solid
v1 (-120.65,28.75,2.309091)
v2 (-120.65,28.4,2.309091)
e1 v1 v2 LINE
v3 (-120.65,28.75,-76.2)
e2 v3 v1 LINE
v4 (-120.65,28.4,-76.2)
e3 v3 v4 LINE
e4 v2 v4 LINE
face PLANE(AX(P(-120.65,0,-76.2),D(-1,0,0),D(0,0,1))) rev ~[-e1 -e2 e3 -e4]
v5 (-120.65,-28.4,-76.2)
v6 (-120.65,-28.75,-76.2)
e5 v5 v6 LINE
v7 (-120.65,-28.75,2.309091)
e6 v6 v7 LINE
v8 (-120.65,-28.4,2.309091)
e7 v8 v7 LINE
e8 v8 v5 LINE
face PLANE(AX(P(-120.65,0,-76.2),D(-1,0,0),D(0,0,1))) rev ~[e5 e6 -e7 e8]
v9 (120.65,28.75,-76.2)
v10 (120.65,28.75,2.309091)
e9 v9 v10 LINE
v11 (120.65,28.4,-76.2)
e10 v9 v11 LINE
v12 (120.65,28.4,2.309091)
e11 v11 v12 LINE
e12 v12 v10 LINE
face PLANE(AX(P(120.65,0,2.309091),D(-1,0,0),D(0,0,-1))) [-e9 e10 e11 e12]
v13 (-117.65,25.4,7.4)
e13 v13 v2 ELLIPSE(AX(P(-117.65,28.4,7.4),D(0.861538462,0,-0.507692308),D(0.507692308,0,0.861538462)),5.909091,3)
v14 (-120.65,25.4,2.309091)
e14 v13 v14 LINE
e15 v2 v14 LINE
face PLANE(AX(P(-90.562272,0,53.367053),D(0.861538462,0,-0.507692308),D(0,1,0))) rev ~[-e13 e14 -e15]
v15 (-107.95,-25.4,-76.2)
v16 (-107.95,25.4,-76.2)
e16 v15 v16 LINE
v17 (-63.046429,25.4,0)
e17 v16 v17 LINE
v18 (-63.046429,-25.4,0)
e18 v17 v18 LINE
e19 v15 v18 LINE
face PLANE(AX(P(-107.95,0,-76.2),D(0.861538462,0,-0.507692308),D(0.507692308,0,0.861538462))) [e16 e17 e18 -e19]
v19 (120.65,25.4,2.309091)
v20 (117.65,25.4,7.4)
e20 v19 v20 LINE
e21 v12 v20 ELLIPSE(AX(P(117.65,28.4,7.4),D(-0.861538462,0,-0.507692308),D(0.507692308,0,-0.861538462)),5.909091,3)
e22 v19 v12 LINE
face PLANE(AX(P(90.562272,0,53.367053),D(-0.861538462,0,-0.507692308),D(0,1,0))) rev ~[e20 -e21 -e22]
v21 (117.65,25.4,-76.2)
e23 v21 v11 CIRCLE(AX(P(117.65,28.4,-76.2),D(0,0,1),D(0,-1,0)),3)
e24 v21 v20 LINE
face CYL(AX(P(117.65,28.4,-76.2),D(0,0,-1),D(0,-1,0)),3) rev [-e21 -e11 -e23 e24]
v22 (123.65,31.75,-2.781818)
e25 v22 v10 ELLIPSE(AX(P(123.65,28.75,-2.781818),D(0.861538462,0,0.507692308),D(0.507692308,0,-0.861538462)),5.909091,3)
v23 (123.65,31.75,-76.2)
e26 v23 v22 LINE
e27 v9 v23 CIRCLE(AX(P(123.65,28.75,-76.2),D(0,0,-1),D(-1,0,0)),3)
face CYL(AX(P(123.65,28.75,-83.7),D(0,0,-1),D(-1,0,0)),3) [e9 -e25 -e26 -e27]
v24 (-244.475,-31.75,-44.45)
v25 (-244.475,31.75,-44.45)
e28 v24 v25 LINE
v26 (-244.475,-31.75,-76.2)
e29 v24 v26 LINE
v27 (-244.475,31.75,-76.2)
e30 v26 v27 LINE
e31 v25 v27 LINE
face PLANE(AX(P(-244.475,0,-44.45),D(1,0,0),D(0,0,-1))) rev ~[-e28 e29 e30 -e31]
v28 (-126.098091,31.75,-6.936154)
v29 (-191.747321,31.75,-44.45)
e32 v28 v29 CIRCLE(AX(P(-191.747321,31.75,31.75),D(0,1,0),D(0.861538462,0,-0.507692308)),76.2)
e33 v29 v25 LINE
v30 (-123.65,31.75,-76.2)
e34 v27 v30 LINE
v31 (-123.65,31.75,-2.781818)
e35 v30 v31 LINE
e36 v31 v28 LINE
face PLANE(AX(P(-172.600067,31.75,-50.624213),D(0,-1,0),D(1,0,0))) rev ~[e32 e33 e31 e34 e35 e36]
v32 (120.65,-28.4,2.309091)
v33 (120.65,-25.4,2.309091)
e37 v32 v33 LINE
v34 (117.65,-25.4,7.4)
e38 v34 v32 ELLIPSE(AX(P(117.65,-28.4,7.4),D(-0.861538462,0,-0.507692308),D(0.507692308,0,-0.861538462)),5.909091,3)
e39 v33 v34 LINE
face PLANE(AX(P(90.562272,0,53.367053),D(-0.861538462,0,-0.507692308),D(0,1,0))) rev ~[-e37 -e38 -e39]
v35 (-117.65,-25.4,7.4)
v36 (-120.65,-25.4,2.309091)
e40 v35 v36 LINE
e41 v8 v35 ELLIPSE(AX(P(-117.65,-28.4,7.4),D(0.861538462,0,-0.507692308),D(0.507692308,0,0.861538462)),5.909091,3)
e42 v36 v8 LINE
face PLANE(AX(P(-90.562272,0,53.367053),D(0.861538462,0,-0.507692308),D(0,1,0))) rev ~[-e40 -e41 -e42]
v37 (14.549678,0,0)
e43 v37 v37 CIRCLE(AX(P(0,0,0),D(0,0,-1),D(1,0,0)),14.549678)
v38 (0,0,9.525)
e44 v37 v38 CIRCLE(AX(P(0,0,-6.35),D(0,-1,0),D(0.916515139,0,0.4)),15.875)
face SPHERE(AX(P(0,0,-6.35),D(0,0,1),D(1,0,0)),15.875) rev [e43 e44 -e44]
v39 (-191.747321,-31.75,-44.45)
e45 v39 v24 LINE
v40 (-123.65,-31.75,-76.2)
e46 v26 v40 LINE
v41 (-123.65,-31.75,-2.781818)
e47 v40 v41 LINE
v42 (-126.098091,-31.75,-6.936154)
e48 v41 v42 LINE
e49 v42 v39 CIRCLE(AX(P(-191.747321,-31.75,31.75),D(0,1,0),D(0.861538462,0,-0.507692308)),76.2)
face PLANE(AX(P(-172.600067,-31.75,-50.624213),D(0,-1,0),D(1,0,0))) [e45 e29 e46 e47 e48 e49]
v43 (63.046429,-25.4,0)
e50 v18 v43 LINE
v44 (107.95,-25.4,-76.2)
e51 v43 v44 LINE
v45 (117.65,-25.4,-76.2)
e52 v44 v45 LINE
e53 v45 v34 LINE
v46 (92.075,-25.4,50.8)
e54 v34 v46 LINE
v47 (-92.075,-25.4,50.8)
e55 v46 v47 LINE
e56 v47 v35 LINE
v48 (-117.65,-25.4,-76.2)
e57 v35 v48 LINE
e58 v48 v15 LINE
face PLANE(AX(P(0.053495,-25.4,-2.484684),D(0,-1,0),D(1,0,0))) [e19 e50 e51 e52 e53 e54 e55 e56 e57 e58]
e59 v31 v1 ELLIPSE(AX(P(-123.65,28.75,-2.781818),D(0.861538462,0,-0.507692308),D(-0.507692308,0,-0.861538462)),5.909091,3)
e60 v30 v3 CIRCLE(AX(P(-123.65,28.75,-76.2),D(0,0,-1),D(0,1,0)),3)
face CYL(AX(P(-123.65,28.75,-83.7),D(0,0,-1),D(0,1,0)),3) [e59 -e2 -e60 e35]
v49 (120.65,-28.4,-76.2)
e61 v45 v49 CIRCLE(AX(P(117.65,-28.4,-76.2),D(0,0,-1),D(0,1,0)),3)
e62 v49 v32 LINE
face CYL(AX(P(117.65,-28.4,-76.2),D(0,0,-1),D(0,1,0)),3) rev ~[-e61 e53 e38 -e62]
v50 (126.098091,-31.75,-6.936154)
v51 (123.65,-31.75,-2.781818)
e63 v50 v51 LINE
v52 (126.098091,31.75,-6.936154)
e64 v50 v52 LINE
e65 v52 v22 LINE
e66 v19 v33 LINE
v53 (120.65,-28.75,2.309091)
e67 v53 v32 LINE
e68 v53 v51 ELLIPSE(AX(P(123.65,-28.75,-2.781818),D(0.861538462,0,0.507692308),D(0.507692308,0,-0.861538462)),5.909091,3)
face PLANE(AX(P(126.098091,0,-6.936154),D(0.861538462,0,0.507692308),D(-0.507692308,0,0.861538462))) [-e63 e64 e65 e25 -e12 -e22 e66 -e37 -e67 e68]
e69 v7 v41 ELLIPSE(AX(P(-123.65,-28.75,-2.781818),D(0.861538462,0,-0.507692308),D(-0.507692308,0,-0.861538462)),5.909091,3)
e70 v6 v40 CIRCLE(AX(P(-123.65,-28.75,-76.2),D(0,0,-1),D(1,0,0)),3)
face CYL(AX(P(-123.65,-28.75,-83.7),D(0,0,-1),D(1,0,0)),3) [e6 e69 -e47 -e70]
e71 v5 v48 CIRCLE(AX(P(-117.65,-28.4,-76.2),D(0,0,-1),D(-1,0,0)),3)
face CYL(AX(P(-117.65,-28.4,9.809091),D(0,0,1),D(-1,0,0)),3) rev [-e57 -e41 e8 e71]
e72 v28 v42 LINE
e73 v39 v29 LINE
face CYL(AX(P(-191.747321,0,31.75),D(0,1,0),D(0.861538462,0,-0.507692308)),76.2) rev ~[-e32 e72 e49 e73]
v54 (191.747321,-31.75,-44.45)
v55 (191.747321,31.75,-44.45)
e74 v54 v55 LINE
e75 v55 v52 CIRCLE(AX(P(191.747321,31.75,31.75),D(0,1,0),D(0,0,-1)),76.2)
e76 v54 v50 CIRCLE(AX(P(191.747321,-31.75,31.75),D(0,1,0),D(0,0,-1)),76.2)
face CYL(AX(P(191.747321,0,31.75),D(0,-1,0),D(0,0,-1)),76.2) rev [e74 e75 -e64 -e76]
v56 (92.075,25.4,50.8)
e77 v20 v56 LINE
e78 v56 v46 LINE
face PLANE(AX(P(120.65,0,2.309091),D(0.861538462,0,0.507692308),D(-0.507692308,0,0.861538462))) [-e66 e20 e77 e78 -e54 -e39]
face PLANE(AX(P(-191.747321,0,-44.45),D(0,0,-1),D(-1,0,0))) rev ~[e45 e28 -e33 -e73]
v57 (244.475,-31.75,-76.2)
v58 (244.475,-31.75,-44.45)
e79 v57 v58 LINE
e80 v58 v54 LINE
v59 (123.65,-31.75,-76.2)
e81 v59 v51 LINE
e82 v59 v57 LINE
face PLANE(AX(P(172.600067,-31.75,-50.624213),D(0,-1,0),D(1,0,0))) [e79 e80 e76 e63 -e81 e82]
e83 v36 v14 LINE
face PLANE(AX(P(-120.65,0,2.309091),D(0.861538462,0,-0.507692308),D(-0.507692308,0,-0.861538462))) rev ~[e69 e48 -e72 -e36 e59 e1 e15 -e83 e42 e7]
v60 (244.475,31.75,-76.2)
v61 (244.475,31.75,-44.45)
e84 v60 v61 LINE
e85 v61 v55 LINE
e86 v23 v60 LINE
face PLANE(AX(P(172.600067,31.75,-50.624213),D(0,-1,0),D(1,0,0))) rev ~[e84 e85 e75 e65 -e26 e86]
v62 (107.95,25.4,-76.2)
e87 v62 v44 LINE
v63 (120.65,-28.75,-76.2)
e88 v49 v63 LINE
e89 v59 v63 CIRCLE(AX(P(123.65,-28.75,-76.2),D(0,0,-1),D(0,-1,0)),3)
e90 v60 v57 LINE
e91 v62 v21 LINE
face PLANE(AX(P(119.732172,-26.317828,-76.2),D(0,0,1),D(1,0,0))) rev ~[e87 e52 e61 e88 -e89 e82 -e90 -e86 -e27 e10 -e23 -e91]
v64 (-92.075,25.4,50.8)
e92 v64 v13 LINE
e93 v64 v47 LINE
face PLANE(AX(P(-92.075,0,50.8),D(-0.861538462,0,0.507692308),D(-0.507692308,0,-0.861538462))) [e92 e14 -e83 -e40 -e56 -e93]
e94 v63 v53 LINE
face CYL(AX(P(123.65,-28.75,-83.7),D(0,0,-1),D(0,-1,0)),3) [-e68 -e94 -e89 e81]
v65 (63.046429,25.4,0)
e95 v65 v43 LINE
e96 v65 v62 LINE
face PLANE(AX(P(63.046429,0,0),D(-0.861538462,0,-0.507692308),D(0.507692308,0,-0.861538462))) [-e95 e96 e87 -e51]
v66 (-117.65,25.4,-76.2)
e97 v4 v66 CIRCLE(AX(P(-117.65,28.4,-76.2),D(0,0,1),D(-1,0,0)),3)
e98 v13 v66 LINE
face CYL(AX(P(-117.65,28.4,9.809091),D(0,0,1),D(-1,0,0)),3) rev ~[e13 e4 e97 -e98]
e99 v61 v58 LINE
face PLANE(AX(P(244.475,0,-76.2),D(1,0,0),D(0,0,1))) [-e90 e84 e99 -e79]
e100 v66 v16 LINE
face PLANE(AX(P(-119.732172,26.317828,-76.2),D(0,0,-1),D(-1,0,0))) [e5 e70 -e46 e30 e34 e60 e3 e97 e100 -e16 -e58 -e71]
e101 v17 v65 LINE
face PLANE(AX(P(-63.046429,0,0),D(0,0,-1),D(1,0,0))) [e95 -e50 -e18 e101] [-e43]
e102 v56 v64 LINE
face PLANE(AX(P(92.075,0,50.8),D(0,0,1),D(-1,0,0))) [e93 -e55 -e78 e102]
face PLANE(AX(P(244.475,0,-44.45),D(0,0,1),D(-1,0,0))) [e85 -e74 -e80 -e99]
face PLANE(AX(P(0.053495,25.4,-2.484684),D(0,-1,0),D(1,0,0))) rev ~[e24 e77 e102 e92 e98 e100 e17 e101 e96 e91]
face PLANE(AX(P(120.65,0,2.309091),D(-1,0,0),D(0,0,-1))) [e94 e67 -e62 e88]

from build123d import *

# Parameters (mm, degrees)
F1_DEPTH     = 25.4
F2_DEPTH     = 31.75
F3_T4_DEPTH  = 86.0090909091
F3_T9_DEPTH  = 86.0090909091
F3_T14_DEPTH = 86.0090909091
F3_T19_DEPTH = 86.0090909091
F3_T21_DEPTH = 93.5090909091


# Not quite as in the source:
# - a fillet or chamfer that OpenCascade refuses, or shapes differently, is made with other operations: its cross-section is extruded or revolved along the edge and cut away or added


with BuildPart() as f1:
    # F0 (on Front) → F1 (new body, symmetric)
    with BuildSketch(Plane.XZ):
        with BuildLine():
            Line((-107.95, -76.2), (-63.0464285714, 0))
            Line((-63.0464285714, 0), (0, 0))
            Line((0, 0), (0, 9.525))
            ThreePointArc((0, 9.525), (8.6950956004, 6.9319779212), (14.5496778315, 0))
            Line((14.5496778315, 0), (63.0464285714, 0))
            Line((63.0464285714, 0), (107.95, -76.2))
            Line((107.95, -76.2), (120.65, -76.2))
            Line((120.65, -76.2), (120.65, 2.3090909091))
            Line((120.65, 2.3090909091), (92.075, 50.8))
            Line((92.075, 50.8), (-92.075, 50.8))
            Line((-92.075, 50.8), (-120.65, 2.3090909091))
            Line((-120.65, 2.3090909091), (-120.65, -76.2))
            Line((-120.65, -76.2), (-107.95, -76.2))
        make_face()
        with BuildLine():
            Line((0, 9.525), (0, 0))
            Line((0, 0), (14.5496778315, 0))
            ThreePointArc((14.5496778315, 0), (8.6950956004, 6.9319779212), (0, 9.525))
        make_face()
    extrude(amount=F1_DEPTH, both=True)

    # F0 (on Front) → F2 (join, symmetric)
    with BuildSketch(Plane.XZ):
        with BuildLine():
            Line((-244.475, -76.2), (-120.65, -76.2))
            Line((-120.65, -76.2), (-120.65, 2.3090909091))
            Line((-120.65, 2.3090909091), (-126.0980906593, -6.9361538462))
            ThreePointArc((-126.0980906593, -6.9361538462), (-153.9415343258, -34.4101274299), (-191.7473214286, -44.45))
            Line((-191.7473214286, -44.45), (-244.475, -44.45))
            Line((-244.475, -44.45), (-244.475, -76.2))
        make_face()
        with BuildLine():
            Line((120.65, 2.3090909091), (120.65, -76.2))
            Line((120.65, -76.2), (244.475, -76.2))
            Line((244.475, -76.2), (244.475, -44.45))
            Line((244.475, -44.45), (191.7473214286, -44.45))
            ThreePointArc((191.7473214286, -44.45), (153.9415343258, -34.4101274299), (126.0980906593, -6.9361538462))
            Line((126.0980906593, -6.9361538462), (120.65, 2.3090909091))
        make_face()
    extrude(amount=F2_DEPTH, both=True)

    # F3: fillet of radius 3 on 8 edges, made by hand


with BuildPart() as f3_tool2:
    # F3_s3 → F3_t4 (new body)
    with BuildSketch(Plane.XY.offset(9.8090909091)):
        with BuildLine():
            ThreePointArc((-120.65, -28.4), (-119.7713203436, -26.2786796564), (-117.65, -25.4))
            Line((-117.65, -25.4), (-120.65, -25.4))
            Line((-120.65, -25.4), (-120.65, -28.4))
        make_face()
    extrude(amount=-F3_T4_DEPTH)

    split(bisect_by=Plane(origin=(-90.5622721893, 0, 53.3670532544), x_dir=(0, 1, 0), z_dir=(0.8615384615, 0, -0.5076923077)), keep=Keep.TOP)


with BuildPart() as f1_1:
    add(f1.part)

    # F3_t1: union F3_tool2
    add(f3_tool2.part)


with BuildPart() as f3_tool7:
    # F3_s8 → F3_t9 (new body)
    with BuildSketch(Plane.XY.offset(9.8090909091)):
        with BuildLine():
            ThreePointArc((-120.65, 28.4), (-119.7713203436, 26.2786796564), (-117.65, 25.4))
            Line((-117.65, 25.4), (-120.65, 25.4))
            Line((-120.65, 25.4), (-120.65, 28.4))
        make_face()
    extrude(amount=-F3_T9_DEPTH)

    split(bisect_by=Plane(origin=(-90.5622721893, 0, 53.3670532544), x_dir=(0, 1, 0), z_dir=(0.8615384615, 0, -0.5076923077)), keep=Keep.TOP)


with BuildPart() as f1_2:
    add(f1_1.part)

    # F3_t6: union F3_tool7
    add(f3_tool7.part)


with BuildPart() as f3_tool12:
    # F3_s13 → F3_t14 (new body)
    with BuildSketch(Plane.XY.offset(-76.2)):
        with BuildLine():
            ThreePointArc((117.65, 25.4), (119.7713203436, 26.2786796564), (120.65, 28.4))
            Line((120.65, 28.4), (120.65, 25.4))
            Line((120.65, 25.4), (117.65, 25.4))
        make_face()
    extrude(amount=F3_T14_DEPTH)

    split(bisect_by=Plane(origin=(90.5622721893, 0, 53.3670532544), x_dir=(0, 1, 0), z_dir=(-0.8615384615, 0, -0.5076923077)), keep=Keep.TOP)


with BuildPart() as f1_3:
    add(f1_2.part)

    # F3_t11: union F3_tool12
    add(f3_tool12.part)


with BuildPart() as f3_tool17:
    # F3_s18 → F3_t19 (new body)
    with BuildSketch(Plane.XY.offset(-76.2)):
        with BuildLine():
            ThreePointArc((117.65, -25.4), (119.7713203436, -26.2786796564), (120.65, -28.4))
            Line((120.65, -28.4), (120.65, -25.4))
            Line((120.65, -25.4), (117.65, -25.4))
        make_face()
    extrude(amount=F3_T19_DEPTH)

    split(bisect_by=Plane(origin=(90.5622721893, 0, 53.3670532544), x_dir=(0, 1, 0), z_dir=(-0.8615384615, 0, -0.5076923077)), keep=Keep.TOP)


with BuildPart() as f1_4:
    add(f1_3.part)

    # F3_t16: union F3_tool17
    add(f3_tool17.part)

    # F3_s22 → F3_t21 (cut)
    with BuildSketch(Plane.XY.offset(-83.7)):
        with BuildLine():
            ThreePointArc((-120.65, -28.75), (-121.5286796564, -30.8713203436), (-123.65, -31.75))
            Line((-123.65, -31.75), (-120.65, -31.75))
            Line((-120.65, -31.75), (-120.65, -28.75))
        make_face()
        with BuildLine():
            ThreePointArc((-123.65, 31.75), (-121.5286796564, 30.8713203436), (-120.65, 28.75))
            Line((-120.65, 28.75), (-120.65, 31.75))
            Line((-120.65, 31.75), (-123.65, 31.75))
        make_face()
        with BuildLine():
            ThreePointArc((120.65, 28.75), (121.5286796564, 30.8713203436), (123.65, 31.75))
            Line((123.65, 31.75), (120.65, 31.75))
            Line((120.65, 31.75), (120.65, 28.75))
        make_face()
        with BuildLine():
            ThreePointArc((123.65, -31.75), (121.5286796564, -30.8713203436), (120.65, -28.75))
            Line((120.65, -28.75), (120.65, -31.75))
            Line((120.65, -31.75), (123.65, -31.75))
        make_face()
    extrude(amount=F3_T21_DEPTH, mode=Mode.SUBTRACT)

    # F0 (on Front) → F4 (revolve, cut)
    with BuildSketch(Plane.XZ):
        with BuildLine():
            Line((0, 9.525), (0, 0))
            Line((0, 0), (14.5496778315, 0))
            ThreePointArc((14.5496778315, 0), (8.6950956004, 6.9319779212), (0, 9.525))
        make_face()
    revolve(axis=Axis((0, 0, 4.7625), (0, 0, -1)), mode=Mode.SUBTRACT)


solid = f1_4.part
